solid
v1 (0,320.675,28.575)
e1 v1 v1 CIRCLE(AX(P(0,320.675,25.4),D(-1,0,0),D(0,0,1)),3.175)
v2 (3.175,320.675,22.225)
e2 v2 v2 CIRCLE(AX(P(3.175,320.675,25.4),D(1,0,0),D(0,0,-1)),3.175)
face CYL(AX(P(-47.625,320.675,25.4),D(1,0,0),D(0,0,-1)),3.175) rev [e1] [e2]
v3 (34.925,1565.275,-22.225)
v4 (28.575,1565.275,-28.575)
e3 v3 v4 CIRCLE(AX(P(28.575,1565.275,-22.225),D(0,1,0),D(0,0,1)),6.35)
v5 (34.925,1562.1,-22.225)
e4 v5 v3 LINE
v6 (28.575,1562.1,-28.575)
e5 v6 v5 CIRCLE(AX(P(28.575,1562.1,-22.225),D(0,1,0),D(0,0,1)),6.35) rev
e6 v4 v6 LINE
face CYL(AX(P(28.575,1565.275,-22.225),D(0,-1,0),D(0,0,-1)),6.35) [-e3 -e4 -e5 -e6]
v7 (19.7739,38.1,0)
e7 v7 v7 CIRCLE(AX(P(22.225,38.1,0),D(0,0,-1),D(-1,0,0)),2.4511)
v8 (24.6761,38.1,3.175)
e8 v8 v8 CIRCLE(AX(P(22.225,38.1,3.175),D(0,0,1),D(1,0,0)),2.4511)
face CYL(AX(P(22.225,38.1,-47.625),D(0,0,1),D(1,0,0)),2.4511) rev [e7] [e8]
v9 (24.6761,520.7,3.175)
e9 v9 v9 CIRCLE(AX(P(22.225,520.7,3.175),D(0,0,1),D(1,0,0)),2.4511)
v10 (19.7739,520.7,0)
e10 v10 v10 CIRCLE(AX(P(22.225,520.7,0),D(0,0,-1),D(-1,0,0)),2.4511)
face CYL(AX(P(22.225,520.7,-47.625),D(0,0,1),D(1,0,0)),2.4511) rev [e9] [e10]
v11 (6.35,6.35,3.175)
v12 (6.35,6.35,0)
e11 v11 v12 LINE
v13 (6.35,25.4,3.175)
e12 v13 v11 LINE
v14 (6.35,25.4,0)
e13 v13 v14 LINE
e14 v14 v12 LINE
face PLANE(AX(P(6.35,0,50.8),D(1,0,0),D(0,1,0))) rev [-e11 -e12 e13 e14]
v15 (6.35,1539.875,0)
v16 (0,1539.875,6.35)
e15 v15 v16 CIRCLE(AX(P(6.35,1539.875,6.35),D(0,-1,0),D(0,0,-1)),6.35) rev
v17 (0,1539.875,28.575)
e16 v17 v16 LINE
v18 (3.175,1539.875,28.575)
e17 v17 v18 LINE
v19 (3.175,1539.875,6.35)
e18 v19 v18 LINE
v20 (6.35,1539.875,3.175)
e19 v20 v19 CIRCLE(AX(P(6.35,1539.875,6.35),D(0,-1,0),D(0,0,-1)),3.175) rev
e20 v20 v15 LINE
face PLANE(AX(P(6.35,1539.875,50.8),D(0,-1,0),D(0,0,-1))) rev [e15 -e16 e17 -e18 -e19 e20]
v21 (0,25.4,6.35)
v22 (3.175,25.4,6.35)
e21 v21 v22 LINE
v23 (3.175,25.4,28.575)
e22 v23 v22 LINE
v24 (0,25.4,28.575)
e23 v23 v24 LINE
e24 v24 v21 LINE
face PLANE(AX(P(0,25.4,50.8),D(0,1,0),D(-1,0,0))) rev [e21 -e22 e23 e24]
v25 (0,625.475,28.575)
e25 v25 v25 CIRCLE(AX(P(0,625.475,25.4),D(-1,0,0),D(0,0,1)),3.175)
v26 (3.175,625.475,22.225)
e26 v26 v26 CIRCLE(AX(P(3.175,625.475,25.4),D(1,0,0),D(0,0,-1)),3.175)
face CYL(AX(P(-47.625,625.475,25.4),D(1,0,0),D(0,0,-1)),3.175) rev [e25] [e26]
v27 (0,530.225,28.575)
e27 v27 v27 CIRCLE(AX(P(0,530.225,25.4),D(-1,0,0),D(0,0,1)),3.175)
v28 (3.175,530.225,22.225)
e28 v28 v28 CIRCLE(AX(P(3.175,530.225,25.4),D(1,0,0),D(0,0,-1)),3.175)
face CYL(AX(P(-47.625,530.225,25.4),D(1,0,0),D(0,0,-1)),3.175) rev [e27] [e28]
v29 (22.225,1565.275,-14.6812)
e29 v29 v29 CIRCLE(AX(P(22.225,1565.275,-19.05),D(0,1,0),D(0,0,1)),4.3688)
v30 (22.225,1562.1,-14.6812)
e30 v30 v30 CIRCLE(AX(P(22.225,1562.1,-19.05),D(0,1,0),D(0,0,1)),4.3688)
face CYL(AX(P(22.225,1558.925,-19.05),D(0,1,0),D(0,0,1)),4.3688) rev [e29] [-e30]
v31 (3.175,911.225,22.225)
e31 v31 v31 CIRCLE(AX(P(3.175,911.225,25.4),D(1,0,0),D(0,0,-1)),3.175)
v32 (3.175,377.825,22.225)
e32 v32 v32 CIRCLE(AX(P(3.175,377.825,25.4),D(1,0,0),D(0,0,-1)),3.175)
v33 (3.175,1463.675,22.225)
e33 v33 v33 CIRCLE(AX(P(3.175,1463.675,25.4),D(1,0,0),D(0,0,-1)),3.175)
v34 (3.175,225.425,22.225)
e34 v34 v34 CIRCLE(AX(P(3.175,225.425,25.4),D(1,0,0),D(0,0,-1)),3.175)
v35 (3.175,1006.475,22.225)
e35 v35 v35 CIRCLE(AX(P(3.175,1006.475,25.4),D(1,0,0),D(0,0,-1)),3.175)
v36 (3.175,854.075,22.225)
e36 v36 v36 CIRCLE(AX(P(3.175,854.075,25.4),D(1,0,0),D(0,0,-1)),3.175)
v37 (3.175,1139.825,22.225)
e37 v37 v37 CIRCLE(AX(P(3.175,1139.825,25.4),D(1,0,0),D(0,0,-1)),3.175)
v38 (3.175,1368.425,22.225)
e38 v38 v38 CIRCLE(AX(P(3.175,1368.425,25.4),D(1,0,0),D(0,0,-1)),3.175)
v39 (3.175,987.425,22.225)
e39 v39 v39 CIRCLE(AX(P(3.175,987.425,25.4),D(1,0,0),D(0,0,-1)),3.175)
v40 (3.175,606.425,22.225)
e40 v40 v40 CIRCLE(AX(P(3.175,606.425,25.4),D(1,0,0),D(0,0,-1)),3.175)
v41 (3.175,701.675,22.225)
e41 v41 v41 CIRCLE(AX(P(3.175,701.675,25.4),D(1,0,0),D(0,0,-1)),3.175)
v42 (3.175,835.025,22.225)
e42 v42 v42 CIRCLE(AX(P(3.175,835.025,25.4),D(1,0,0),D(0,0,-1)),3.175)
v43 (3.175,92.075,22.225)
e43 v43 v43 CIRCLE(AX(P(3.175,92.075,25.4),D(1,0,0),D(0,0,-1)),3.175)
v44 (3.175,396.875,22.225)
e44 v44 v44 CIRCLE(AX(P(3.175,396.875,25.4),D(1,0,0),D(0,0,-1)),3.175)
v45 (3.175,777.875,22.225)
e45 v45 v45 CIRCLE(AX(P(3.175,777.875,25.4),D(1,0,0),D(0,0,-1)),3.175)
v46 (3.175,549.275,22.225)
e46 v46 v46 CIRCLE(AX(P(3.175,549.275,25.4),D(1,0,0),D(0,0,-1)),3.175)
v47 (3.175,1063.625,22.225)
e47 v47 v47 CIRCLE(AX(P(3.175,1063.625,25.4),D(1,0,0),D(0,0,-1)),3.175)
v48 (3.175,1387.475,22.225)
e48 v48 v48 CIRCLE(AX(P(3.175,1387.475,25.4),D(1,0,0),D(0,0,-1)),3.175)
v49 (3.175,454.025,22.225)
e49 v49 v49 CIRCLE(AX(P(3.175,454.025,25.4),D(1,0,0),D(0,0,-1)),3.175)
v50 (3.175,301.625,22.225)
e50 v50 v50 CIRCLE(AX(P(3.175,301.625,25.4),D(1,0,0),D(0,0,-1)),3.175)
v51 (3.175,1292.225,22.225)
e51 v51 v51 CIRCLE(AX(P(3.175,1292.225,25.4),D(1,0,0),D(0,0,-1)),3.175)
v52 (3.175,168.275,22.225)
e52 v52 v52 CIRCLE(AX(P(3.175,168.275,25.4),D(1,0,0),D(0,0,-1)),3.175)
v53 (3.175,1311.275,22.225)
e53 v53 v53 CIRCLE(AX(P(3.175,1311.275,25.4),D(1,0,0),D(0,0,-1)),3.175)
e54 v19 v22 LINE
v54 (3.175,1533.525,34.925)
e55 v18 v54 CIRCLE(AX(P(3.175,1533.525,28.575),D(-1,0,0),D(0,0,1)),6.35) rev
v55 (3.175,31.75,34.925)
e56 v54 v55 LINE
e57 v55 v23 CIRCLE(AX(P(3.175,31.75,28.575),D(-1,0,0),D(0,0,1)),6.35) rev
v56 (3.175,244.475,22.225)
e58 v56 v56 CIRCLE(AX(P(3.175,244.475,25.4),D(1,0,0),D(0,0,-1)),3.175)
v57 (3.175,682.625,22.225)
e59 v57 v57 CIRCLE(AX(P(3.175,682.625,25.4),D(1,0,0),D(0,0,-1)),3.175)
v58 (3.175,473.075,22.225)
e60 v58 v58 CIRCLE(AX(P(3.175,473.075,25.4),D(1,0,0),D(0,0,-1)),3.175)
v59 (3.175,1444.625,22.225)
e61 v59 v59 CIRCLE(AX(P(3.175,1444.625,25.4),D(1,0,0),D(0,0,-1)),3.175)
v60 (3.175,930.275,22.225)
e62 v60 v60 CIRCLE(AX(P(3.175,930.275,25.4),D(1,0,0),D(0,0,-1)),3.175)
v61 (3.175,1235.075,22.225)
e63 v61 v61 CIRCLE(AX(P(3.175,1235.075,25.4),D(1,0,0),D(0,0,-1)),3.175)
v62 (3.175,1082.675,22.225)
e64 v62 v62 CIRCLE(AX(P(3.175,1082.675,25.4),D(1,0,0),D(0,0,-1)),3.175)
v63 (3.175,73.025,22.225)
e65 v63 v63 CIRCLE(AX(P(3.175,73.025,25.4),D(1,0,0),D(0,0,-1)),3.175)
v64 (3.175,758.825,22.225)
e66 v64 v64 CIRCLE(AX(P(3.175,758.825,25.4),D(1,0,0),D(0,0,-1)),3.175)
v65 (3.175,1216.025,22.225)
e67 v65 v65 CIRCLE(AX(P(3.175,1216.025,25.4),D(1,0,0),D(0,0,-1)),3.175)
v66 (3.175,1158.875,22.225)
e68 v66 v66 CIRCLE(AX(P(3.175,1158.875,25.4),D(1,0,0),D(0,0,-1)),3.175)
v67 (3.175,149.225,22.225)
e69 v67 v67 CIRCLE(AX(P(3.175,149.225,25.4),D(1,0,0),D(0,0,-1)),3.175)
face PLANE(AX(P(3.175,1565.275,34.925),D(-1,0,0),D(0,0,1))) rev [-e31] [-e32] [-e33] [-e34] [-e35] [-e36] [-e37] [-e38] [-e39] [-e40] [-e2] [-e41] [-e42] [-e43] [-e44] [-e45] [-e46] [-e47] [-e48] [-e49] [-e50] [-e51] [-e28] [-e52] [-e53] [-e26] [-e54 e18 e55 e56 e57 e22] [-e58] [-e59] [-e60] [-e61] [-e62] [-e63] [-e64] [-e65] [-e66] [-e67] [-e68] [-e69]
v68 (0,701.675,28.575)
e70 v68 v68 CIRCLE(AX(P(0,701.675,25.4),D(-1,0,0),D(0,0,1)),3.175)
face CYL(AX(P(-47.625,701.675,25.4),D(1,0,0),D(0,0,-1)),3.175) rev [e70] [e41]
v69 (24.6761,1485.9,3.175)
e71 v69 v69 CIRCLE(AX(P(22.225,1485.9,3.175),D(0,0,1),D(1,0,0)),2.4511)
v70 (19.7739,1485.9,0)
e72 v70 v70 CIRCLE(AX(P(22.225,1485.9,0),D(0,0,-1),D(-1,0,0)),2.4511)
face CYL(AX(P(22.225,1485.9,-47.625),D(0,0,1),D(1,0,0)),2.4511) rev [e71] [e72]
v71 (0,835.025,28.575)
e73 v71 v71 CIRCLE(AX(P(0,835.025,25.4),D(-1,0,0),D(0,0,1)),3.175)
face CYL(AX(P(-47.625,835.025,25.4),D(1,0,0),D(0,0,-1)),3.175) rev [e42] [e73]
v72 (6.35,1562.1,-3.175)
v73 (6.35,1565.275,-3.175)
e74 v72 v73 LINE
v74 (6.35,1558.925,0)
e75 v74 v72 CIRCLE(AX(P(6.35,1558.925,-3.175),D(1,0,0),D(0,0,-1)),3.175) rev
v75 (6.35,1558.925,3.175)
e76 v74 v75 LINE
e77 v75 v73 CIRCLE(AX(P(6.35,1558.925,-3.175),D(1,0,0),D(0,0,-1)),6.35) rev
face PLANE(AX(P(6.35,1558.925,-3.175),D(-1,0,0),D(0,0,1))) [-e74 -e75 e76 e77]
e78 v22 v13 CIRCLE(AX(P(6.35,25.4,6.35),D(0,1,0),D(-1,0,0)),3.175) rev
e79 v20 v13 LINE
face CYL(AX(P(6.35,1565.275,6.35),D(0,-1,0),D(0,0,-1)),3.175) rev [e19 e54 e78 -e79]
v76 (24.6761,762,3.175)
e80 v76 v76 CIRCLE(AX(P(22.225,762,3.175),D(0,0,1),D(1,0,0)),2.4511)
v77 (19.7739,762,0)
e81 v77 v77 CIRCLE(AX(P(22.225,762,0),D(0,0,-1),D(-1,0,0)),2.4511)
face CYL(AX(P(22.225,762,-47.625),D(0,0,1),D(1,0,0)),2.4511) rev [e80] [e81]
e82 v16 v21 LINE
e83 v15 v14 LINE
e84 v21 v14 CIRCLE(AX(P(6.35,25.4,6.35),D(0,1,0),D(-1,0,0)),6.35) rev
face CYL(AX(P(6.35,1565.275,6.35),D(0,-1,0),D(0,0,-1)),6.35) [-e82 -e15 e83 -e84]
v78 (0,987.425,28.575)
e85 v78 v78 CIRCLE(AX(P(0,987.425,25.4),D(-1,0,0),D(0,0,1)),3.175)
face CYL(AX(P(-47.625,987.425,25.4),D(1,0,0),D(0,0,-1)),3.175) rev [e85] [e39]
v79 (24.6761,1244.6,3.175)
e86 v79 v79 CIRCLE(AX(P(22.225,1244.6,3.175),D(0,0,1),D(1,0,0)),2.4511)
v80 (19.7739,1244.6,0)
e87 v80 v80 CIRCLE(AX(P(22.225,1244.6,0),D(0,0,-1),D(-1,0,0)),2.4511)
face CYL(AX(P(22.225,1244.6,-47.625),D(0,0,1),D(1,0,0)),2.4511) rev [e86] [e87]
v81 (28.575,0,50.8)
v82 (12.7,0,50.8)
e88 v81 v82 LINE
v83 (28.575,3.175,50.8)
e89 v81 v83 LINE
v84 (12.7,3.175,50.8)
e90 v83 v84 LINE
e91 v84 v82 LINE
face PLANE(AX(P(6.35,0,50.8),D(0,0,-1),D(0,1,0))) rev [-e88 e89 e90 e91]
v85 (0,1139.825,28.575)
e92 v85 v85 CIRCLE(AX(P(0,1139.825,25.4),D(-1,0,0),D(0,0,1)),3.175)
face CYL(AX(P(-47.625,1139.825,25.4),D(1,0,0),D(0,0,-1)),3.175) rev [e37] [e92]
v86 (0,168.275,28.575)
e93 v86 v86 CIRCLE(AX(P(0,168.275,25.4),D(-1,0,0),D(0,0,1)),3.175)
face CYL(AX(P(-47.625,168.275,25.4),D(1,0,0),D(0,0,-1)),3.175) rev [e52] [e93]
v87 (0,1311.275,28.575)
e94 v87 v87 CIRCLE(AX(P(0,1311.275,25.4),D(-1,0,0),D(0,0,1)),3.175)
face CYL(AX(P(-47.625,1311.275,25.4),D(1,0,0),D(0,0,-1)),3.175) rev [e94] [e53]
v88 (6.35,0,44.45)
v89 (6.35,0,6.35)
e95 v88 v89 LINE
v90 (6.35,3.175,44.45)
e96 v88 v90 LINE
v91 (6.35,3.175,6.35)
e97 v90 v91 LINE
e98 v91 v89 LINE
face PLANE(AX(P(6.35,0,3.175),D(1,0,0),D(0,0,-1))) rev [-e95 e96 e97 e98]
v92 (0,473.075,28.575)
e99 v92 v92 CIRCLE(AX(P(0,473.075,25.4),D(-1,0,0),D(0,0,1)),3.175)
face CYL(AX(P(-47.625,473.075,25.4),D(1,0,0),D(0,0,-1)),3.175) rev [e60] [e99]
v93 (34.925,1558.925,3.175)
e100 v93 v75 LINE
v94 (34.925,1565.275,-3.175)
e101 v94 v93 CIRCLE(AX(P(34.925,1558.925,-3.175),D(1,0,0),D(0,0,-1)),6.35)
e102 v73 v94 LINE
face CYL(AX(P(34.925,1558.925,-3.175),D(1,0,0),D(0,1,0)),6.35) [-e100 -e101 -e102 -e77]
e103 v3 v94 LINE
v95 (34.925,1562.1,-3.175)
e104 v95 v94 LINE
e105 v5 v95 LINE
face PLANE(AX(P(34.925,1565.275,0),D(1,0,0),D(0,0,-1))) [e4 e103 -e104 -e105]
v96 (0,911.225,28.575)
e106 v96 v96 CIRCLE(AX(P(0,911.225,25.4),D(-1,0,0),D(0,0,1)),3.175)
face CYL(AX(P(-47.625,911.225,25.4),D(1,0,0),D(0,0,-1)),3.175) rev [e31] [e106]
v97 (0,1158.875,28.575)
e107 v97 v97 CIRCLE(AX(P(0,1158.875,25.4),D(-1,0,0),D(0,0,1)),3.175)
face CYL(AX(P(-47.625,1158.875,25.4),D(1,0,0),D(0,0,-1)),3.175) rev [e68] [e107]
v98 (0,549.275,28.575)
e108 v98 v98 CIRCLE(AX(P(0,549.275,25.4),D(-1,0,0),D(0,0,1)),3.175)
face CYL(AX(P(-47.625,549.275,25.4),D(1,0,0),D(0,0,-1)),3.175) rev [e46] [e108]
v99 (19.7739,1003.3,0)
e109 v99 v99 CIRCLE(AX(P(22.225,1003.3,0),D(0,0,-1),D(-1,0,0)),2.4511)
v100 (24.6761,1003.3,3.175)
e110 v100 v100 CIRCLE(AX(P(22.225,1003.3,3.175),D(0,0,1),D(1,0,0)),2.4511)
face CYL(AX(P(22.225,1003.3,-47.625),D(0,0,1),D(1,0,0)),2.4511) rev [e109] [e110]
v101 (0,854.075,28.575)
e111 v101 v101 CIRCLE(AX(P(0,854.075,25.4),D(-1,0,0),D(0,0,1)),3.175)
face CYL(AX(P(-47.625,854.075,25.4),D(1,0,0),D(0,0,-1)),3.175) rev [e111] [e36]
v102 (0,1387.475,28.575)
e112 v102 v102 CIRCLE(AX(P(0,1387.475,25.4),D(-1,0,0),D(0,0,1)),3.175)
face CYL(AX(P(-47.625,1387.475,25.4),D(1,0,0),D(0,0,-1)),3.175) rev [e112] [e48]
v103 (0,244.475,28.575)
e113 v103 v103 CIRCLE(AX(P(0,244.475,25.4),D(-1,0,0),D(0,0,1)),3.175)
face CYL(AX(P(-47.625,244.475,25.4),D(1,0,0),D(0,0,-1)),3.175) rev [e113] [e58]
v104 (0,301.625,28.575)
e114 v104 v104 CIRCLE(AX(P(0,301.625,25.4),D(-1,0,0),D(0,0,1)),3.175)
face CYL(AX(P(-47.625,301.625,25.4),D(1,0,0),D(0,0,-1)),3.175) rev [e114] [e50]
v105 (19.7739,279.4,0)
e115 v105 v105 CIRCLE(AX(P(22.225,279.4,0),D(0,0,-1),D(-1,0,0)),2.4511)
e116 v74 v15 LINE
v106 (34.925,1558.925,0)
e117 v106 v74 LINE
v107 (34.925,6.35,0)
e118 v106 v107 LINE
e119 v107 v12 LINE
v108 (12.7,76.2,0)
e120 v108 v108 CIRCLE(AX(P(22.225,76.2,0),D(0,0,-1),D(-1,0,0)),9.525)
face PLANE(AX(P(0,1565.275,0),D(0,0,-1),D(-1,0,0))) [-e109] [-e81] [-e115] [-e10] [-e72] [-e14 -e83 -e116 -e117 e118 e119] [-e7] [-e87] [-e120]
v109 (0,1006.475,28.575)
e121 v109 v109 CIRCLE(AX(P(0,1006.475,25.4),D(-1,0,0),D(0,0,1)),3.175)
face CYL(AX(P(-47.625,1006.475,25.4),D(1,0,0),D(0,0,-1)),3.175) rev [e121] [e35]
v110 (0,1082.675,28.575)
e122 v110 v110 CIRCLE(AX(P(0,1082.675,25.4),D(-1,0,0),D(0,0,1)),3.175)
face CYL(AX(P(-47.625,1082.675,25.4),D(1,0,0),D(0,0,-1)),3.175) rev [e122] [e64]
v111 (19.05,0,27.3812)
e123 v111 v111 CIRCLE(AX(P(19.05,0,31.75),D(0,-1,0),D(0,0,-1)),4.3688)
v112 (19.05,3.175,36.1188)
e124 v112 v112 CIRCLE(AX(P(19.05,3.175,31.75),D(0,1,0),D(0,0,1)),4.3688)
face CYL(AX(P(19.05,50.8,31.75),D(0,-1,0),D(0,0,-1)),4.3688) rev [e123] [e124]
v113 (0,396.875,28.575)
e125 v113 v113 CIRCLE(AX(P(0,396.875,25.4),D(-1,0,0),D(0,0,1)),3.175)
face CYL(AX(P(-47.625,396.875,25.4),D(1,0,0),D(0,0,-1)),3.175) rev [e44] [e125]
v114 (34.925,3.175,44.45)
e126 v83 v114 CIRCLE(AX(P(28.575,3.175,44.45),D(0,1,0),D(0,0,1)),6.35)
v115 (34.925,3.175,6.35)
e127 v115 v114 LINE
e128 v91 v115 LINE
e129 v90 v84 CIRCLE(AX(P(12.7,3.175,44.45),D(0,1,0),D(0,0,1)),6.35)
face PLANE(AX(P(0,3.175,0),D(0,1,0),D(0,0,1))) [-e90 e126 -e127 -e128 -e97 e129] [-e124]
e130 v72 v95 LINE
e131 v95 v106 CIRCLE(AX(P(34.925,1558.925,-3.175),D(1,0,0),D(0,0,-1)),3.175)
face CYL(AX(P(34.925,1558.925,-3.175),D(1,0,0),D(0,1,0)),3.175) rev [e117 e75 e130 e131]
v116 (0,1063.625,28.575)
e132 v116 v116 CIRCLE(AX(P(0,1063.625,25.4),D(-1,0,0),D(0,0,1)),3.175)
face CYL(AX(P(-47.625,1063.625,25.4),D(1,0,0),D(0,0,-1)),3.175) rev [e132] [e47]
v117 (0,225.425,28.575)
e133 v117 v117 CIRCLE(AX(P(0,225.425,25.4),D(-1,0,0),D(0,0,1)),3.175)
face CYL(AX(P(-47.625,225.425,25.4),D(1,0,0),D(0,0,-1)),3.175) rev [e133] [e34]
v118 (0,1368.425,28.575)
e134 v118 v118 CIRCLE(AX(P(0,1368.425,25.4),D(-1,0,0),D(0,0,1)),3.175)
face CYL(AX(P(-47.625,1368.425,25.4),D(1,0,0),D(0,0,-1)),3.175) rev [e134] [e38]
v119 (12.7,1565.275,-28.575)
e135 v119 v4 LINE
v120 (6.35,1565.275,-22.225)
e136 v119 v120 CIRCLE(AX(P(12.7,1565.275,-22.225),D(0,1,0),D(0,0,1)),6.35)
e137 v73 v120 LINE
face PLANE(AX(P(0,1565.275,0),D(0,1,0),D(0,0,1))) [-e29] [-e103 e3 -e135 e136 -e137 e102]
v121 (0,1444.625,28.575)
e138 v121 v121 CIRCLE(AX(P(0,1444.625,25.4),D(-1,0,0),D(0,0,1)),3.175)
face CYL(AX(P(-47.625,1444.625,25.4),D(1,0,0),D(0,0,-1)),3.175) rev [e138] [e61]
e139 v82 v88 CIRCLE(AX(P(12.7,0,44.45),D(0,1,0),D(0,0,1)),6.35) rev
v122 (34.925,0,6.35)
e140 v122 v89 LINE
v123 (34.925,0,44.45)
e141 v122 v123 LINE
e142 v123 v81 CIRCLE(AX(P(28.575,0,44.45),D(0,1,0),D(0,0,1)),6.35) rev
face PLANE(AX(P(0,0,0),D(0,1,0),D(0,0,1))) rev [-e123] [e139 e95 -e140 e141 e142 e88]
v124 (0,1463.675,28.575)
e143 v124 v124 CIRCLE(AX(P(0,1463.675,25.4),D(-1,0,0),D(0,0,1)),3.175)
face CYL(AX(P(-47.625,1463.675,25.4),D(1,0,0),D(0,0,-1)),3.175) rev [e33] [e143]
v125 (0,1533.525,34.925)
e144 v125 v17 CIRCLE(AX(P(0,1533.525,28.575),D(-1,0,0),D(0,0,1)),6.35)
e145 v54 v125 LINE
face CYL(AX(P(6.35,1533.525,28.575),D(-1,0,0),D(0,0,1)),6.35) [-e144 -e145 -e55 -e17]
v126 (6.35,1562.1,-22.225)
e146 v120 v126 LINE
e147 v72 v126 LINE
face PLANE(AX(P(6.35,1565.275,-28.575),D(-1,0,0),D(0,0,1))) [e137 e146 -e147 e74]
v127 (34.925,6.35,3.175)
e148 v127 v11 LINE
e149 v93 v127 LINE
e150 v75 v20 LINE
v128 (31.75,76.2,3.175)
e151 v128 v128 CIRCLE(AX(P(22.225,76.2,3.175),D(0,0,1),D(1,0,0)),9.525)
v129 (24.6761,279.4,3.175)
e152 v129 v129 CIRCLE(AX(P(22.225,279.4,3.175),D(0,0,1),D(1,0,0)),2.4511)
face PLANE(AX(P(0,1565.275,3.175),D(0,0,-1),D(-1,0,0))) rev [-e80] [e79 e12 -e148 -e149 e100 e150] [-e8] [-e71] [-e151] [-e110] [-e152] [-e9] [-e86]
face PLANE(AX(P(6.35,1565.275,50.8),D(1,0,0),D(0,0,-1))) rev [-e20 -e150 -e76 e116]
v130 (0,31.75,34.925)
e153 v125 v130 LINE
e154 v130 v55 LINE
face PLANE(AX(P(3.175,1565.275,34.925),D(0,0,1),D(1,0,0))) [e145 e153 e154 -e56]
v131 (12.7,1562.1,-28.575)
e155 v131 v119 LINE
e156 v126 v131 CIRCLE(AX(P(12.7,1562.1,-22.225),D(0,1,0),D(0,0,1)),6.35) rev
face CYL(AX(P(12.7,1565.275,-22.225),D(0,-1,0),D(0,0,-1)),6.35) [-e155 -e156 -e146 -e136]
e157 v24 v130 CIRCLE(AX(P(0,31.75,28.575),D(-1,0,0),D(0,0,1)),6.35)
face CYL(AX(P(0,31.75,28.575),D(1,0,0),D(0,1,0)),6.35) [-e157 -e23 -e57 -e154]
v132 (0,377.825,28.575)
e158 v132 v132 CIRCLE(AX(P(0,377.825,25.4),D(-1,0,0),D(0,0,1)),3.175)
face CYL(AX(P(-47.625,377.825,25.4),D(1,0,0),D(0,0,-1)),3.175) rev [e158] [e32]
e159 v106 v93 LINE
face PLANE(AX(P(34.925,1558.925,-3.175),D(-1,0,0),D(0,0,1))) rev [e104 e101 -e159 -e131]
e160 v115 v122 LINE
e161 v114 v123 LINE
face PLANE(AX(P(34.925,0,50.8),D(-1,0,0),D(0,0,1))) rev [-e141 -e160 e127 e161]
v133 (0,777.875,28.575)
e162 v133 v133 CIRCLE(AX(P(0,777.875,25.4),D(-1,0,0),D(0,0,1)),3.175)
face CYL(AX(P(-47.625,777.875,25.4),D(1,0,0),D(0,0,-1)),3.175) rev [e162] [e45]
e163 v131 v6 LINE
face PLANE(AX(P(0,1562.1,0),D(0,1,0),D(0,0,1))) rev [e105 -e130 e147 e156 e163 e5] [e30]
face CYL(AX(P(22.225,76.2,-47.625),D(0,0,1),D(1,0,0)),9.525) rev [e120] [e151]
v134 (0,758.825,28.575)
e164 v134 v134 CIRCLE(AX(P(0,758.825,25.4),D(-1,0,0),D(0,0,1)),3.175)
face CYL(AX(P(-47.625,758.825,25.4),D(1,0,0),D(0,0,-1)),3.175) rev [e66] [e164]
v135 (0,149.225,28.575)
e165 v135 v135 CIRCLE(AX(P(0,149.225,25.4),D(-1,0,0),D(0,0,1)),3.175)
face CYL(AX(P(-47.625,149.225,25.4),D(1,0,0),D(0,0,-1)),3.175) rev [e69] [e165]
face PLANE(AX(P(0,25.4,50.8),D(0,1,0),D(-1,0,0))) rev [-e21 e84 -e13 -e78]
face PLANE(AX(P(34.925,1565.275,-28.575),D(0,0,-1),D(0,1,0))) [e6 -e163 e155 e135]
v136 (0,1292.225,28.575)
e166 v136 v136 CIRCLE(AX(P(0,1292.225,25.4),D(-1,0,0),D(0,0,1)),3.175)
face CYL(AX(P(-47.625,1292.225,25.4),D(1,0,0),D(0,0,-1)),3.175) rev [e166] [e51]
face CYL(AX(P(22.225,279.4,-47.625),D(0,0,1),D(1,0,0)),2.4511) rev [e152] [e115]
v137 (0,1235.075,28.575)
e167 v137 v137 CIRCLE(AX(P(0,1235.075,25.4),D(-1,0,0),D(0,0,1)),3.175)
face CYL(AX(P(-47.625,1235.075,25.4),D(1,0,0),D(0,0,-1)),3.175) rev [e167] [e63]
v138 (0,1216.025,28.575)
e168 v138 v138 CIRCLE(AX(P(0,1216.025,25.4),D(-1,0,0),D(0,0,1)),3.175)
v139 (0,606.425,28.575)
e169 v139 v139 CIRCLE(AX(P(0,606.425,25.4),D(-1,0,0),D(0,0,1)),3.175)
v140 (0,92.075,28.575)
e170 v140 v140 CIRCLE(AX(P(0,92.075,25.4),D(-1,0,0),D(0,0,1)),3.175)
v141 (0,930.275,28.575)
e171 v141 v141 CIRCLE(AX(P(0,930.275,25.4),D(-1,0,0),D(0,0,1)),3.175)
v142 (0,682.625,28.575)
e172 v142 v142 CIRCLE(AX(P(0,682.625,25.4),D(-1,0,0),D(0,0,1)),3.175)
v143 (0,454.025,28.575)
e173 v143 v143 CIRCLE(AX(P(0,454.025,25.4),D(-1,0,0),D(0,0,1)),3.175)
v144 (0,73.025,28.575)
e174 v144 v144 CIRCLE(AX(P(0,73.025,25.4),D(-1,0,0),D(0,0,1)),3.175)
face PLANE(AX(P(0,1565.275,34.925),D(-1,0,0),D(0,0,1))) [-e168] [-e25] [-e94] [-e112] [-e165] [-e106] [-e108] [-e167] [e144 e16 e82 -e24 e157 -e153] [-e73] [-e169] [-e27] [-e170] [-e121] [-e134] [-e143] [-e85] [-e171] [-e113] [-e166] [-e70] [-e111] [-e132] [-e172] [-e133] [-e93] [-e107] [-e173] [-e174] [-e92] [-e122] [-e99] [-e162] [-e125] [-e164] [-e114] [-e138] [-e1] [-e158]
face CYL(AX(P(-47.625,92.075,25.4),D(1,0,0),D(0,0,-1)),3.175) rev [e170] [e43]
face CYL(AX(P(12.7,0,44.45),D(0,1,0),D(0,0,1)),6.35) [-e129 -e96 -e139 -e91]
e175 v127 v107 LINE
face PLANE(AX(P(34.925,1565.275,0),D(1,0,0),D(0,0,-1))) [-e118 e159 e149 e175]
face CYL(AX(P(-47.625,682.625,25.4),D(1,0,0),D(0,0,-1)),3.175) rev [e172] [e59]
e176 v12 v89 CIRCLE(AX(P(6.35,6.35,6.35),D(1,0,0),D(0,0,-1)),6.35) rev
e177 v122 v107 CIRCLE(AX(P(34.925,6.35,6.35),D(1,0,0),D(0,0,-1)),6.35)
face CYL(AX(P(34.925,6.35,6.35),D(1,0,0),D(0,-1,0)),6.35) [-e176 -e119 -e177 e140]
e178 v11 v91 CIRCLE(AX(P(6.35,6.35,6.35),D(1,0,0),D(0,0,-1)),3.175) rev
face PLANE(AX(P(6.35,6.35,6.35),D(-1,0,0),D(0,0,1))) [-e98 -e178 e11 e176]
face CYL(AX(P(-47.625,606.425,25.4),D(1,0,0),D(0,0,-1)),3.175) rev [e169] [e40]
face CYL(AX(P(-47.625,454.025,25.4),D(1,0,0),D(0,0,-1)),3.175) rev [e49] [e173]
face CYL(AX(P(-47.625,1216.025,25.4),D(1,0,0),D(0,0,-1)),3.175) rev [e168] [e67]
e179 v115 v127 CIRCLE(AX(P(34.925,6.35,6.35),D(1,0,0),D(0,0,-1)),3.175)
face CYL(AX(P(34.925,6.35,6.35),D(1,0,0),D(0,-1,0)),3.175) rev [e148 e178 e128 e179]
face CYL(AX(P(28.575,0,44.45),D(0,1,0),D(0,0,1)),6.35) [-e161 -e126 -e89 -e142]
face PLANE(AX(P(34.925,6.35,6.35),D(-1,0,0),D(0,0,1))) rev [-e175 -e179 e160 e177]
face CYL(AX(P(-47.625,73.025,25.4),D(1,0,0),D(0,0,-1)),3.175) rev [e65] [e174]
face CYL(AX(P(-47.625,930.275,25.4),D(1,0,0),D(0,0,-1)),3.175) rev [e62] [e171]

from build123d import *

# Parameters (mm, degrees)
BASE_FLANGE1_DEPTH           = 1565.275
SKETCH6_W                    = 6.35
SKETCH6_H                    = 25.4
CUT_EXTRUDE1_DEPTH           = 50.8
EDGE_FLANGE1_STRIP_W         = 19.05
EDGE_FLANGE1_STRIP_H         = 3.175
EDGE_FLANGE1_STRIP_CUT_DEPTH = 28.575
EDGE_FLANGE1_DEPTH           = 28.575
FILLET1_R                    = 6.35
SKETCH10_R                   = 2.4511
SKETCH10_R_2                 = 9.525
CUT_EXTRUDE2_DEPTH           = 50.8
SKETCH11_R                   = 4.3688
CUT_EXTRUDE3_DEPTH           = 50.8
SKETCH12_R                   = 3.175
CUT_EXTRUDE4_DEPTH           = 50.8
EDGE_FLANGE3_STRIP_W         = 19.05
EDGE_FLANGE3_STRIP_H         = 3.175
EDGE_FLANGE3_STRIP_CUT_DEPTH = 28.575
EDGE_FLANGE3_DEPTH           = 28.575
FILLET2_R                    = 6.35
SKETCH21_R                   = 4.3688
CUT_EXTRUDE5_DEPTH           = 6.35


# Sheet-metal steps are written as plain solids
with BuildPart() as part:
    # Sketch1 → Base-Flange1 (new body)
    with BuildSketch(Plane(origin=(0, 0, 0), x_dir=(1, 0, 0), z_dir=(0, 1, 0))):
        with BuildLine():
            Line((0, -34.925), (0, -6.35))
            ThreePointArc((0, -6.35), (1.859871939, -1.859871939), (6.35, 0))
            Line((6.35, 0), (34.925, 0))
            Line((34.925, 0), (34.925, -3.175))
            Line((34.925, -3.175), (6.35, -3.175))
            ThreePointArc((6.35, -3.175), (4.10493597, -4.10493597), (3.175, -6.35))
            Line((3.175, -6.35), (3.175, -34.925))
            Line((3.175, -34.925), (0, -34.925))
        make_face()
    extrude(amount=BASE_FLANGE1_DEPTH)

    # Sketch6 → Cut-Extrude1 (cut)
    with BuildSketch(Plane(origin=(0, 0, 0), x_dir=(-1, 0, 0), z_dir=(0, 0, -1))):
        with Locations((-3.175, 12.7)):
            Rectangle(SKETCH6_W, SKETCH6_H)
        with Locations((-3.175, 1552.575)):
            Rectangle(SKETCH6_W, SKETCH6_H)
    extrude(amount=-CUT_EXTRUDE1_DEPTH, mode=Mode.SUBTRACT)

    # Edge-Flange1 strip (across the edge) → Edge-Flange1 strip cut (cut)
    with BuildSketch(Plane(origin=(6.35, 0, 3.175), x_dir=(0, 1, 0), z_dir=(1, 0, 0))):
        with Locations((-3.175, -1.5875)):
            Rectangle(EDGE_FLANGE1_STRIP_W, EDGE_FLANGE1_STRIP_H)
    extrude(amount=EDGE_FLANGE1_STRIP_CUT_DEPTH, mode=Mode.SUBTRACT)

    # Edge-Flange1 section (across the edge) → Edge-Flange1 (add)
    with BuildSketch(Plane(origin=(6.35, 0, 3.175), x_dir=(0, 1, 0), z_dir=(1, 0, 0))):
        with BuildLine():
            Line((0, 3.175), (0, 47.625))
            Line((0, 47.625), (3.175, 47.625))
            Line((3.175, 47.625), (3.175, 3.175))
            ThreePointArc((3.175, 3.175), (4.10493597, 0.92993597), (6.35, 0))
            Line((6.35, 0), (6.35, -3.175))
            ThreePointArc((6.35, -3.175), (1.859871939, -1.315128061), (0, 3.175))
        make_face()
    extrude(amount=EDGE_FLANGE1_DEPTH)

    # Fillet1
    fillet1_edges = [part.edges().sort_by_distance(p)[0] for p in [
        (6.35, 1.5875, 50.8),
        (34.925, 1.5875, 50.8),
        (1.5875, 25.4, 34.925),
        (1.5875, 1539.875, 34.925),
    ]]
    fillet(fillet1_edges, radius=FILLET1_R)

    # Sketch10 → Cut-Extrude2 (cut)
    with BuildSketch(Plane.XY.offset(3.175)):
        with Locations((22.225, 38.1)):
            Circle(SKETCH10_R)
        with Locations((22.225, 279.4)):
            Circle(SKETCH10_R)
        with Locations((22.225, 520.7)):
            Circle(SKETCH10_R)
        with Locations((22.225, 762)):
            Circle(SKETCH10_R)
        with Locations((22.225, 1003.3)):
            Circle(SKETCH10_R)
        with Locations((22.225, 1244.6)):
            Circle(SKETCH10_R)
        with Locations((22.225, 1485.9)):
            Circle(SKETCH10_R)
        with Locations((22.225, 76.2)):
            Circle(SKETCH10_R_2)
    extrude(amount=-CUT_EXTRUDE2_DEPTH, mode=Mode.SUBTRACT)

    # Sketch11 → Cut-Extrude3 (cut)
    with BuildSketch(Plane.XZ):
        with Locations(Location((19.05, 31.75, 0), (0, 0, 270))):
            Circle(SKETCH11_R)
    extrude(amount=-CUT_EXTRUDE3_DEPTH, mode=Mode.SUBTRACT)

    # Sketch12 → Cut-Extrude4 (cut)
    with BuildSketch(Plane(origin=(3.175, 0, 0), x_dir=(0, 0, -1), z_dir=(1, 0, 0))):
        with Locations((-25.4, 73.025)):
            Circle(SKETCH12_R)
        with Locations((-25.4, 92.075)):
            Circle(SKETCH12_R)
        with Locations((-25.4, 149.225)):
            Circle(SKETCH12_R)
        with Locations((-25.4, 168.275)):
            Circle(SKETCH12_R)
        with Locations((-25.4, 225.425)):
            Circle(SKETCH12_R)
        with Locations((-25.4, 244.475)):
            Circle(SKETCH12_R)
        with Locations((-25.4, 301.625)):
            Circle(SKETCH12_R)
        with Locations((-25.4, 320.675)):
            Circle(SKETCH12_R)
        with Locations((-25.4, 377.825)):
            Circle(SKETCH12_R)
        with Locations((-25.4, 396.875)):
            Circle(SKETCH12_R)
        with Locations((-25.4, 454.025)):
            Circle(SKETCH12_R)
        with Locations((-25.4, 473.075)):
            Circle(SKETCH12_R)
        with Locations((-25.4, 530.225)):
            Circle(SKETCH12_R)
        with Locations((-25.4, 549.275)):
            Circle(SKETCH12_R)
        with Locations((-25.4, 606.425)):
            Circle(SKETCH12_R)
        with Locations((-25.4, 625.475)):
            Circle(SKETCH12_R)
        with Locations((-25.4, 682.625)):
            Circle(SKETCH12_R)
        with Locations((-25.4, 701.675)):
            Circle(SKETCH12_R)
        with Locations((-25.4, 758.825)):
            Circle(SKETCH12_R)
        with Locations((-25.4, 777.875)):
            Circle(SKETCH12_R)
        with Locations((-25.4, 835.025)):
            Circle(SKETCH12_R)
        with Locations((-25.4, 854.075)):
            Circle(SKETCH12_R)
        with Locations((-25.4, 911.225)):
            Circle(SKETCH12_R)
        with Locations((-25.4, 930.275)):
            Circle(SKETCH12_R)
        with Locations((-25.4, 987.425)):
            Circle(SKETCH12_R)
        with Locations((-25.4, 1006.475)):
            Circle(SKETCH12_R)
        with Locations((-25.4, 1063.625)):
            Circle(SKETCH12_R)
        with Locations((-25.4, 1082.675)):
            Circle(SKETCH12_R)
        with Locations((-25.4, 1139.825)):
            Circle(SKETCH12_R)
        with Locations((-25.4, 1158.875)):
            Circle(SKETCH12_R)
        with Locations((-25.4, 1216.025)):
            Circle(SKETCH12_R)
        with Locations((-25.4, 1235.075)):
            Circle(SKETCH12_R)
        with Locations((-25.4, 1292.225)):
            Circle(SKETCH12_R)
        with Locations((-25.4, 1311.275)):
            Circle(SKETCH12_R)
        with Locations((-25.4, 1368.425)):
            Circle(SKETCH12_R)
        with Locations((-25.4, 1387.475)):
            Circle(SKETCH12_R)
        with Locations((-25.4, 1444.625)):
            Circle(SKETCH12_R)
        with Locations((-25.4, 1463.675)):
            Circle(SKETCH12_R)
    extrude(amount=-CUT_EXTRUDE4_DEPTH, mode=Mode.SUBTRACT)

    # Edge-Flange3 strip (across the edge) → Edge-Flange3 strip cut (cut)
    with BuildSketch(Plane(origin=(6.35, 1565.275, 0), x_dir=(0, -1, 0), z_dir=(1, 0, 0))):
        with Locations((-3.175, -1.5875)):
            Rectangle(EDGE_FLANGE3_STRIP_W, EDGE_FLANGE3_STRIP_H)
    extrude(amount=EDGE_FLANGE3_STRIP_CUT_DEPTH, mode=Mode.SUBTRACT)

    # Edge-Flange3 section (across the edge) → Edge-Flange3 (add)
    with BuildSketch(Plane(origin=(6.35, 1565.275, 0), x_dir=(0, -1, 0), z_dir=(1, 0, 0))):
        with BuildLine():
            Line((0, 3.175), (0, 28.575))
            Line((0, 28.575), (3.175, 28.575))
            Line((3.175, 28.575), (3.175, 3.175))
            ThreePointArc((3.175, 3.175), (4.10493597, 0.92993597), (6.35, 0))
            Line((6.35, 0), (6.35, -3.175))
            ThreePointArc((6.35, -3.175), (1.859871939, -1.315128061), (0, 3.175))
        make_face()
    extrude(amount=EDGE_FLANGE3_DEPTH)

    # Fillet2
    fillet2_edges = [part.edges().sort_by_distance(p)[0] for p in [
        (6.35, 1563.6875, -28.575),
        (34.925, 1563.6875, -28.575),
    ]]
    fillet(fillet2_edges, radius=FILLET2_R)

    # Sketch21 → Cut-Extrude5 (cut)
    with BuildSketch(Plane(origin=(0, 1565.275, 0), x_dir=(1, 0, 0), z_dir=(0, 1, 0))):
        with Locations(Location((22.225, 19.05, 0), (0, 0, 270))):
            Circle(SKETCH21_R)
    extrude(amount=-CUT_EXTRUDE5_DEPTH, mode=Mode.SUBTRACT)


solid = part.part
